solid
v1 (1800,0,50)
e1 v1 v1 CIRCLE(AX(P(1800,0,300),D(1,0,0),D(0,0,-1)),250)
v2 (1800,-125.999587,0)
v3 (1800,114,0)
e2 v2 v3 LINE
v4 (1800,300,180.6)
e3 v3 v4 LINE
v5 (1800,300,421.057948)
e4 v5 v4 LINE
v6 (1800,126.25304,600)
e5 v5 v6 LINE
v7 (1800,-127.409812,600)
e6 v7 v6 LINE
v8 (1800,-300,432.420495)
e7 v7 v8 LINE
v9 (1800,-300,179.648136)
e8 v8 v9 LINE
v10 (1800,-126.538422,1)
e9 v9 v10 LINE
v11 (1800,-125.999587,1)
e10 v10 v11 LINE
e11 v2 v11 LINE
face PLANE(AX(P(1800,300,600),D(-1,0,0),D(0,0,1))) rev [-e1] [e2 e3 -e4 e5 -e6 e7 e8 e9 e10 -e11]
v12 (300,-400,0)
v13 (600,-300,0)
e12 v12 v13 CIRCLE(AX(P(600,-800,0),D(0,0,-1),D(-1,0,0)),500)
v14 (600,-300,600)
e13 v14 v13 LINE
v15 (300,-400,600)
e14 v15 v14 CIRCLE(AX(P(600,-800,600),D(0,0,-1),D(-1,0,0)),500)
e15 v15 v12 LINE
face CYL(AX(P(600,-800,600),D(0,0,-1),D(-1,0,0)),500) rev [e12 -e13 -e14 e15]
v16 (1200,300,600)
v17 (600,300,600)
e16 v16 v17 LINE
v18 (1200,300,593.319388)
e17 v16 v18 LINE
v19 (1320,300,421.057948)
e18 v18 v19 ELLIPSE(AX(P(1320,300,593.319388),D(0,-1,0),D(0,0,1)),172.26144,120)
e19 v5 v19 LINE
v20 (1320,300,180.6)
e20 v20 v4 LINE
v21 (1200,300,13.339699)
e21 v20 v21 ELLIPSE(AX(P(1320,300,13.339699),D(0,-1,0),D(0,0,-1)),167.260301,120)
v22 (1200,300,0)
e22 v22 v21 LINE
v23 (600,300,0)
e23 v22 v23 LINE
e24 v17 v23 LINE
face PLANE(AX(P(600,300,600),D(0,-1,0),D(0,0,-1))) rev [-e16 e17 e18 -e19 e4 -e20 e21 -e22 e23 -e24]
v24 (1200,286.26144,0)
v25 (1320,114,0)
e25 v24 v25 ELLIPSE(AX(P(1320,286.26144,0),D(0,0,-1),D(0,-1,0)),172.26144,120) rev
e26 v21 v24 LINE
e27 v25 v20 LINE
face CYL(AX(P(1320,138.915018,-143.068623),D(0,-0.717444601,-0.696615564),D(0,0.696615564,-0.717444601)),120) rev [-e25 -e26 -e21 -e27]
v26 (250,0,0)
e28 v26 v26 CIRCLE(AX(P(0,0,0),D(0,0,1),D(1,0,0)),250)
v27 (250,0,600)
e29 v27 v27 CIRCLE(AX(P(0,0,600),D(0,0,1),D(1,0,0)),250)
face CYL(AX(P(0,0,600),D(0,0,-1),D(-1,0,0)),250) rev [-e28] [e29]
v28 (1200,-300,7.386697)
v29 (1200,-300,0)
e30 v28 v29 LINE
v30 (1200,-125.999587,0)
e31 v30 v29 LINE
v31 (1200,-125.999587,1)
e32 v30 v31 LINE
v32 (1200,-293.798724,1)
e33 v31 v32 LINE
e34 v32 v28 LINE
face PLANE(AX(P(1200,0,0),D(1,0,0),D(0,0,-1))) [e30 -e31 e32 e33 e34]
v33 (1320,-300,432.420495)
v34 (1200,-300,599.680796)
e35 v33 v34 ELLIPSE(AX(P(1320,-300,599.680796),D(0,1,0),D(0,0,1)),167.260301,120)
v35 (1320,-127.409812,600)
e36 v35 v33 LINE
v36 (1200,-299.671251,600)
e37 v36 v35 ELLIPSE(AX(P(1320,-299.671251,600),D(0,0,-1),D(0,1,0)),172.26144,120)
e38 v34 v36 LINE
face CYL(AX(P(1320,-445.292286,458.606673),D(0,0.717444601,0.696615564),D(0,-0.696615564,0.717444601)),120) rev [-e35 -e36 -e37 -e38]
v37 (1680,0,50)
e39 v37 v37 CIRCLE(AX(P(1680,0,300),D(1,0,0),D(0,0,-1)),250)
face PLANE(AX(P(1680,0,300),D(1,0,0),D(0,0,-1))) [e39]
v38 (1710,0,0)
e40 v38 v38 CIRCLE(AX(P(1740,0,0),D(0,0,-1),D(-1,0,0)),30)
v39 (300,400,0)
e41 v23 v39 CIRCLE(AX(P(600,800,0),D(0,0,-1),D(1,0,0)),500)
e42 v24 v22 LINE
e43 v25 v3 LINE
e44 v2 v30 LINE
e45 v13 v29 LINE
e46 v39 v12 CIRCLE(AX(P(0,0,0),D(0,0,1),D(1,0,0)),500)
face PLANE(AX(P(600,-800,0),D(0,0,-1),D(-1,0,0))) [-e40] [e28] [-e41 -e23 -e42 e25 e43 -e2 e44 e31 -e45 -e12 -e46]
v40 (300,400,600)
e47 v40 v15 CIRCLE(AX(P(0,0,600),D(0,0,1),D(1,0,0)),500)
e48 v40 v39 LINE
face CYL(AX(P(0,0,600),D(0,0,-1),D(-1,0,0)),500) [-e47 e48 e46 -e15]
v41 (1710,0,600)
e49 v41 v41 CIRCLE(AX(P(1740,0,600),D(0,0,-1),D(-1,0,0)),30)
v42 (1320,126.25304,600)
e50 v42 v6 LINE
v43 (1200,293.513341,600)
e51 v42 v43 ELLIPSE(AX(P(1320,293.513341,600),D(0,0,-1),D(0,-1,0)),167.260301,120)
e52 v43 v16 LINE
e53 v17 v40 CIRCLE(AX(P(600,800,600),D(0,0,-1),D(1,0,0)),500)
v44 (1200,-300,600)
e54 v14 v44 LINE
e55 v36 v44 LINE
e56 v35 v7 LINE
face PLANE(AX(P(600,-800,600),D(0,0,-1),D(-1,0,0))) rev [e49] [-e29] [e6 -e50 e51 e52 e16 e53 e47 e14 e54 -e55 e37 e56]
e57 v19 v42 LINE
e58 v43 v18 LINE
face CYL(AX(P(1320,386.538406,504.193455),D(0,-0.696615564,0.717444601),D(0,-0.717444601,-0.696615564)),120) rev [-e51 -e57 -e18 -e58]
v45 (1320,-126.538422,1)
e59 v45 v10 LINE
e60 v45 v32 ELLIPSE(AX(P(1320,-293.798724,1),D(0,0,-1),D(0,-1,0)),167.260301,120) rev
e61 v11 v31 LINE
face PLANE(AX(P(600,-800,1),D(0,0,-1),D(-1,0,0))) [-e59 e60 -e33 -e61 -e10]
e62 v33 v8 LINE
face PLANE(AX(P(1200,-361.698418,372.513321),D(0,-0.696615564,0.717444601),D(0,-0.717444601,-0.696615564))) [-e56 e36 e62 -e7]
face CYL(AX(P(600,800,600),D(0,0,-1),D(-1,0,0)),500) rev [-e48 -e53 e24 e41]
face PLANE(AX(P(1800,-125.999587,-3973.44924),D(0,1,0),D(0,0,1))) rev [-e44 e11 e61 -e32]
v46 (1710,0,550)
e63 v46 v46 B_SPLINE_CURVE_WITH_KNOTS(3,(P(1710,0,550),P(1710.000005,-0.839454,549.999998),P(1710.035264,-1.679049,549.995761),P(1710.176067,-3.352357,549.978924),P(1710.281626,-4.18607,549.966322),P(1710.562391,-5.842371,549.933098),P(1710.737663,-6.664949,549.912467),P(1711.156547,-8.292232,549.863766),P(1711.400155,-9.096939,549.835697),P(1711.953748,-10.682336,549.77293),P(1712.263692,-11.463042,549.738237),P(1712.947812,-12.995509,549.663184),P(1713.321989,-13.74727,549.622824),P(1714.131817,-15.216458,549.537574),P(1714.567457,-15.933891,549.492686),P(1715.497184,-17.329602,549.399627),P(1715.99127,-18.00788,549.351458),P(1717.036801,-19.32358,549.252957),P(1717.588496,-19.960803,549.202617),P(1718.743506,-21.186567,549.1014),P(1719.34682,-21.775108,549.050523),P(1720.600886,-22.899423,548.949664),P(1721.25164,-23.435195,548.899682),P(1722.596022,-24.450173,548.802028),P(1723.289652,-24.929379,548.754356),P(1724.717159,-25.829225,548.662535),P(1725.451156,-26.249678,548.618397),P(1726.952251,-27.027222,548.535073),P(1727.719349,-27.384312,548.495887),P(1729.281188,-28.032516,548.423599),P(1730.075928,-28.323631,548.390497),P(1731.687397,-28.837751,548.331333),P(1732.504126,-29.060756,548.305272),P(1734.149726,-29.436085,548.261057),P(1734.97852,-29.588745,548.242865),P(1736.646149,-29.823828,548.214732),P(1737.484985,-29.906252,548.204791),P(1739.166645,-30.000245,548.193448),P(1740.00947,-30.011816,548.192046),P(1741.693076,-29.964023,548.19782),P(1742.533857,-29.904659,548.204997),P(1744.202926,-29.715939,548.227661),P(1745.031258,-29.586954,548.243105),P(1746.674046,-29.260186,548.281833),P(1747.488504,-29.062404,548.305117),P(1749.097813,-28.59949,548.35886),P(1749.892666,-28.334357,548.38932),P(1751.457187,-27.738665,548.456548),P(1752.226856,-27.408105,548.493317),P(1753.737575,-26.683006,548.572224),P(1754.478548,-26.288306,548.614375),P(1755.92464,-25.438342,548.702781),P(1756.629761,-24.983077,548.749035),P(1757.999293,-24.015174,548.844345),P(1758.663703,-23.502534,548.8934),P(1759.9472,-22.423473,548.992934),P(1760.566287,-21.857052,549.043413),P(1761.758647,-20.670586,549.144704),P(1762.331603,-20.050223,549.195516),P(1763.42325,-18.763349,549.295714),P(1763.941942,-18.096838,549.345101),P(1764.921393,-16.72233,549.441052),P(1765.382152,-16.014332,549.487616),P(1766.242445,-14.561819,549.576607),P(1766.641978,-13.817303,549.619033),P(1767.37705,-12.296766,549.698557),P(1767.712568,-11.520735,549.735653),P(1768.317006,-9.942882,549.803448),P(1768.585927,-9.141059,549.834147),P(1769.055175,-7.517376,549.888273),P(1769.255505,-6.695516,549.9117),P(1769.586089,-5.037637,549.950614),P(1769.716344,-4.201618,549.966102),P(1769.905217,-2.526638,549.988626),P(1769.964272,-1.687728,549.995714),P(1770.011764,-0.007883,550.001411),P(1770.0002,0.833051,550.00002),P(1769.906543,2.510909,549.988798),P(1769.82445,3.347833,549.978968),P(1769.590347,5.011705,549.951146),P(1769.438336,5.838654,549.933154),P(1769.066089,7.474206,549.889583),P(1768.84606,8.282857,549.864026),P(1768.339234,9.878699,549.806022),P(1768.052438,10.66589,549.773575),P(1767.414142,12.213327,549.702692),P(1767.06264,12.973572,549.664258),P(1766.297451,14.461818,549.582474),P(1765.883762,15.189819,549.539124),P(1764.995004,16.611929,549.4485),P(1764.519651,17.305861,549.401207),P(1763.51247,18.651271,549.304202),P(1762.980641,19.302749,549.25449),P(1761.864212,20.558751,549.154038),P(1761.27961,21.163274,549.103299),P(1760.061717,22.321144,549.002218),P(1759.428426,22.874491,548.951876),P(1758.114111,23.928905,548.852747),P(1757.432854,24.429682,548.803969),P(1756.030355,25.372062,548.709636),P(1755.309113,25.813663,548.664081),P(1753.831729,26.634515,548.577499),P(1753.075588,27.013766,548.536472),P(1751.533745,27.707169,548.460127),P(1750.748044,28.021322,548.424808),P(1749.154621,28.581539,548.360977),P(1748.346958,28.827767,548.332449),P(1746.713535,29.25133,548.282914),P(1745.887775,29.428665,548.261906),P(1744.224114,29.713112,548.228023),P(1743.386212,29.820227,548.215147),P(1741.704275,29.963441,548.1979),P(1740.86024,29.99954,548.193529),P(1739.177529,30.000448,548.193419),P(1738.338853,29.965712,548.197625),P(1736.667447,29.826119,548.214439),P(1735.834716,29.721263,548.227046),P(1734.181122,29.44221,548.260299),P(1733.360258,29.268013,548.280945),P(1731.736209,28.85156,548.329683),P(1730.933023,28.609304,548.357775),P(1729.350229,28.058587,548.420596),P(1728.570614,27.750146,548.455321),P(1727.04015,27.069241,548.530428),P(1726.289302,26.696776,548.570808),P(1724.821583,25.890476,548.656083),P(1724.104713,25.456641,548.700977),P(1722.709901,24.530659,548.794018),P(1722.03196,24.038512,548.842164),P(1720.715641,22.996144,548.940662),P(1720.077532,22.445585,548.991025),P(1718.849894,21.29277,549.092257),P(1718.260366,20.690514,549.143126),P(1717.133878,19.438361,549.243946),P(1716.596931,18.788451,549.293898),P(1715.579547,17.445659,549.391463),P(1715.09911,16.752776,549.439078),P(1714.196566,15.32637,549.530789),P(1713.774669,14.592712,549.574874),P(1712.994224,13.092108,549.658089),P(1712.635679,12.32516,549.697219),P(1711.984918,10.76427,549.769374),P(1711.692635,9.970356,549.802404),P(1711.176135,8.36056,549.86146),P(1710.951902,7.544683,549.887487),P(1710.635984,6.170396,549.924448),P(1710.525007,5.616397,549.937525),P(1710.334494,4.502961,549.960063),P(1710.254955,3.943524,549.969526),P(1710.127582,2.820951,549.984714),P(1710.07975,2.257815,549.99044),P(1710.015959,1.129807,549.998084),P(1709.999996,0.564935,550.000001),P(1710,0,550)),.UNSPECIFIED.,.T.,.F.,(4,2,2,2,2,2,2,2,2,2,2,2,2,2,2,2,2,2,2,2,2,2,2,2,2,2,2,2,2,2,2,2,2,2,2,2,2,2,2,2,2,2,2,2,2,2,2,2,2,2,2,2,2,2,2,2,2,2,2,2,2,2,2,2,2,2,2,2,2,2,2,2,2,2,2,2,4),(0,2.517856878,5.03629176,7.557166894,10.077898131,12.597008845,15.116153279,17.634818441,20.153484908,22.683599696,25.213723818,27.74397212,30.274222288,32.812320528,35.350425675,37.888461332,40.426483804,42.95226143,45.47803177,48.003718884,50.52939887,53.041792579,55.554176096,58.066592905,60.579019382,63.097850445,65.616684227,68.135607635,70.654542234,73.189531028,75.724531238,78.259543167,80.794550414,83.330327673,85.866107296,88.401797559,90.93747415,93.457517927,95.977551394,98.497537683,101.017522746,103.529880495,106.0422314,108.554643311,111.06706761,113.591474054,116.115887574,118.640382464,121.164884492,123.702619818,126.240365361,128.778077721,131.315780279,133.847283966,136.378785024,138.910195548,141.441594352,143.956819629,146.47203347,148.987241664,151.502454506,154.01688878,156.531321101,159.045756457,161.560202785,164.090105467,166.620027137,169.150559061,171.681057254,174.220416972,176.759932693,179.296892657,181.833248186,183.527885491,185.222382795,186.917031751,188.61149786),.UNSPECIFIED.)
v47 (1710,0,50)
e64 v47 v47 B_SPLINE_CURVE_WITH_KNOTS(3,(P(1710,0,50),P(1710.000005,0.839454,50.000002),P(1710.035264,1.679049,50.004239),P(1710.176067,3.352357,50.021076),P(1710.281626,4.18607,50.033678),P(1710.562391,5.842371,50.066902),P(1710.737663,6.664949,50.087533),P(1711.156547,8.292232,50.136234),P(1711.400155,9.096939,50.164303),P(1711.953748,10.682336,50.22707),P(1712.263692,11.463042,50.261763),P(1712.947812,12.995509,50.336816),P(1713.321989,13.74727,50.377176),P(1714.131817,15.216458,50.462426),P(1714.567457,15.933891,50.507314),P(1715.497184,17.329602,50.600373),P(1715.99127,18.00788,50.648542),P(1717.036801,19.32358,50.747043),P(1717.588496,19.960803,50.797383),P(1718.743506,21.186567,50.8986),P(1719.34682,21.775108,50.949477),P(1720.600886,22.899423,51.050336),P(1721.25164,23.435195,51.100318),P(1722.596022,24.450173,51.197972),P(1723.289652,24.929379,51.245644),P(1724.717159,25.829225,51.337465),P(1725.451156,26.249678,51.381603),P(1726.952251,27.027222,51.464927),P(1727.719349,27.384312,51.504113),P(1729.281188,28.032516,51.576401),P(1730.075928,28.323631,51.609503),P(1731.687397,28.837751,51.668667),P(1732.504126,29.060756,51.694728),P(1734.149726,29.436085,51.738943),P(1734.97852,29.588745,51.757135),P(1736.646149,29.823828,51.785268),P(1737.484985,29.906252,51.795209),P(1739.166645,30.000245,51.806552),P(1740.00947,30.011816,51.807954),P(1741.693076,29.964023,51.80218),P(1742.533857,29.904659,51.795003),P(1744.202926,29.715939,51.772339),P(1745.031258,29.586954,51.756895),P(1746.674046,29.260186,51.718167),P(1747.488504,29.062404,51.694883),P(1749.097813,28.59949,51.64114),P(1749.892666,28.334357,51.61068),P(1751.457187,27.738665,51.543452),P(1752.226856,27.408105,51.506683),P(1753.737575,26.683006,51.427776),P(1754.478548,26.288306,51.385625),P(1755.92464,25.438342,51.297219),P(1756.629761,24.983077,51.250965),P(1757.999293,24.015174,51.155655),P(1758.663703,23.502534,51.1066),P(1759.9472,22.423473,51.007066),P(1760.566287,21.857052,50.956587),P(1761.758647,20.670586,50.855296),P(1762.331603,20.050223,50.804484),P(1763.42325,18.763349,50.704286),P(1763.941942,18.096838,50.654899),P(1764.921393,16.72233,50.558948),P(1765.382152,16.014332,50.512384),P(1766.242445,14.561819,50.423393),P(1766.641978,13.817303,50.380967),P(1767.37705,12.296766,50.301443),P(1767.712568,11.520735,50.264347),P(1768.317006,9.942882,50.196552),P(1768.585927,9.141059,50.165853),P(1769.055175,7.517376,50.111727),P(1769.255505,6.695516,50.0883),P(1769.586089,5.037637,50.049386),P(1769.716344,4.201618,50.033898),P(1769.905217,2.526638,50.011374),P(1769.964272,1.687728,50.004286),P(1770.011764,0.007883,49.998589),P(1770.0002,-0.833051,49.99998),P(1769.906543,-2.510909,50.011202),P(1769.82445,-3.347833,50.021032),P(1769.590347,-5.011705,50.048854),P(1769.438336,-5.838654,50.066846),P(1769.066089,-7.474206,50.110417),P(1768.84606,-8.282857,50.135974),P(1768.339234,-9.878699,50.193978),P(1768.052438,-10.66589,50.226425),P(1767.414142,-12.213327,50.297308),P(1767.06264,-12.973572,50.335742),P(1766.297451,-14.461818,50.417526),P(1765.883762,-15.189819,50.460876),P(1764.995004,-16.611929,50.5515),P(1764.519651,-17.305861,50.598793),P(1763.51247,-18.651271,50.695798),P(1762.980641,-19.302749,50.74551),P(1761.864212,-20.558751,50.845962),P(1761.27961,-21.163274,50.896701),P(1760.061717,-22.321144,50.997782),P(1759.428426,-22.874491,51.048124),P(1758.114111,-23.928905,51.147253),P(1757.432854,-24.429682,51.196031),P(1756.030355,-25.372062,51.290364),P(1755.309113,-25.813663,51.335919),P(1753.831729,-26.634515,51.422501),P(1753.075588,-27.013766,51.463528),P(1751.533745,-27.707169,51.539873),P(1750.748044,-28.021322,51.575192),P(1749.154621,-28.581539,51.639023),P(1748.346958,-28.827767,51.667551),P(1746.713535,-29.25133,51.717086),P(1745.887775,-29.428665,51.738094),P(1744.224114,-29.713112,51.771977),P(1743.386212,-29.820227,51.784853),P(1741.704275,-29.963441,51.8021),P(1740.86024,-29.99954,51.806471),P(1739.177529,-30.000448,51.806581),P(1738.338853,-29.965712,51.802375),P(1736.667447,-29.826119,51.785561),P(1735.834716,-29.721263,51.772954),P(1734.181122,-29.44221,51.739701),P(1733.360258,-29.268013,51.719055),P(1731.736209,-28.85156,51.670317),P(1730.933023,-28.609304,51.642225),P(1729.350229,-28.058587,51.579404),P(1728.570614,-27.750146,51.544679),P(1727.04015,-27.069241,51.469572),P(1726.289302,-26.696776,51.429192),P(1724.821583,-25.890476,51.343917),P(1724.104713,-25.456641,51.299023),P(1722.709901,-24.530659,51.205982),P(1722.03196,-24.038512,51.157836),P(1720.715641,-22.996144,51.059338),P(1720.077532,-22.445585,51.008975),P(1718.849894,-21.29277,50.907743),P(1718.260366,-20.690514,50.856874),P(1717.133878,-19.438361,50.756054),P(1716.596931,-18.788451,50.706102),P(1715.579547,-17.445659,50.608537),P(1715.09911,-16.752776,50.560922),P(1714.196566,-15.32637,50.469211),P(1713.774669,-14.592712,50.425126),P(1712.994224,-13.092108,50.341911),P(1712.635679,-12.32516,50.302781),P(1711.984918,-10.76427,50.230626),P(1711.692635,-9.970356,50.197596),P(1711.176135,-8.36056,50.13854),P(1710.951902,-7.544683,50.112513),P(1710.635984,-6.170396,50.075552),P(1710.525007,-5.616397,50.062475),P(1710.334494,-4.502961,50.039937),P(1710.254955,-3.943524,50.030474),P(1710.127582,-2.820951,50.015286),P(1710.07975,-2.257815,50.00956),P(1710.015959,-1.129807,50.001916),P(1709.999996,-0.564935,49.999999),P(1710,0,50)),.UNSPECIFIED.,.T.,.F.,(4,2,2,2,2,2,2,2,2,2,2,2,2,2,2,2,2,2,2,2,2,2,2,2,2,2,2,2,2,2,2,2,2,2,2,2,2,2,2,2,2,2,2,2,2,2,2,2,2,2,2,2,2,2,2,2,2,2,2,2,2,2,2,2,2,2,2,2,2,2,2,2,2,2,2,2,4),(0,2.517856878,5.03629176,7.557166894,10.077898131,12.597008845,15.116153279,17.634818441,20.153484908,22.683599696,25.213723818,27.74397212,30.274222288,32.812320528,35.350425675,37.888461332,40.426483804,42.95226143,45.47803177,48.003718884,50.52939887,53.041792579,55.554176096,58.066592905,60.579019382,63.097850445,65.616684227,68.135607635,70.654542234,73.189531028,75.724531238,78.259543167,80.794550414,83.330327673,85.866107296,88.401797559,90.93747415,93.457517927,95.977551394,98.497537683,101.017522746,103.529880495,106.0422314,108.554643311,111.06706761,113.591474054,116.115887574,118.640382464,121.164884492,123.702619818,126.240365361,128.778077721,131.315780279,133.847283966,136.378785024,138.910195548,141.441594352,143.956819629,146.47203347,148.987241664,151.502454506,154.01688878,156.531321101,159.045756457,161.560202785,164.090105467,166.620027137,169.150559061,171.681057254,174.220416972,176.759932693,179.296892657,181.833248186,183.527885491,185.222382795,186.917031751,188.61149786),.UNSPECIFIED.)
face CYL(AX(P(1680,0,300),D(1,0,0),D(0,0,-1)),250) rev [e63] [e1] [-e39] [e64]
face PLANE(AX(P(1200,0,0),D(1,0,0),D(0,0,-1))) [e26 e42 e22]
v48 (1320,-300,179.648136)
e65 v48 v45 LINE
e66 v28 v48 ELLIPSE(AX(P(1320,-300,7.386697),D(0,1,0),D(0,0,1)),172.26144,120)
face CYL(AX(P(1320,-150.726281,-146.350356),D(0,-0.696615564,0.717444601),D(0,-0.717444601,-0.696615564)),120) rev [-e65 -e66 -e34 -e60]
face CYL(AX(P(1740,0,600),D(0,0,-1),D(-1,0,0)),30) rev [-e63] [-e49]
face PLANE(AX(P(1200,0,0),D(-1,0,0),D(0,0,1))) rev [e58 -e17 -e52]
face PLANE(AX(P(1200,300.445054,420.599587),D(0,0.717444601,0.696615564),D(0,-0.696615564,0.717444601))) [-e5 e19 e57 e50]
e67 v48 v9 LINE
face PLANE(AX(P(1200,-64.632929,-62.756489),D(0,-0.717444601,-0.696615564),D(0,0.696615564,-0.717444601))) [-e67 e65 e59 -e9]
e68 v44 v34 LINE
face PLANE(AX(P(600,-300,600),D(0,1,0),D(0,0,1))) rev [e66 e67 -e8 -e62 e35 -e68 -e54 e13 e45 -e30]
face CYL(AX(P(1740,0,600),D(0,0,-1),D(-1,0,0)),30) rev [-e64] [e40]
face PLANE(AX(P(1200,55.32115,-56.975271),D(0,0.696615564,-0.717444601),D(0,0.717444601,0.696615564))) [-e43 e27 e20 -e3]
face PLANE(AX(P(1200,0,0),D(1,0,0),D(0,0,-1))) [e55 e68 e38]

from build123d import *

# Parameters (mm, degrees)
SKETCH1_R              = 250
BOSS_EXTRUDE1_DEPTH    = 600
CUT_EXTRUDE6_DEPTH     = 600
CUT_EXTRUDE8_START     = -1
CUT_EXTRUDE8_OUTLINE_W = 600
CUT_EXTRUDE8_OUTLINE_H = 174.000412652
CUT_EXTRUDE8_DEPTH     = 1
FILLET2_R              = 120
SKETCH8_R              = 250
CUT_EXTRUDE10_DEPTH    = 120
SKETCH9_R              = 30
CUT_EXTRUDE11_DEPTH    = 1963.141687035


# Read off the part's stored shape, not the designer's step: Cut-Extrude8
with BuildPart() as part:
    # Sketch1 → Boss-Extrude1 (new body)
    with BuildSketch(Plane.XY):
        with BuildLine():
            Line((600, 300), (1800, 300))
            Line((1800, 300), (1800, -300))
            Line((1800, -300), (600, -300))
            ThreePointArc((600, -300), (441.886116992, -325.658350975), (300, -400))
            ThreePointArc((300, -400), (-500, 0), (300, 400))
            ThreePointArc((300, 400), (441.886116992, 325.658350975), (600, 300))
        make_face()
        Circle(SKETCH1_R, mode=Mode.SUBTRACT)
    extrude(amount=BOSS_EXTRUDE1_DEPTH)

    # Sketch2 → Cut-Extrude6 (cut)
    with BuildSketch(Plane(origin=(1800, 0, 0), x_dir=(0, 0, -1), z_dir=(1, 0, 0))):
        Polygon((-180.6, 300), (0, 114), (0, 300), align=None)
        Polygon((-600, -300), (-432.420494682, -300), (-600, -127.409811799), align=None)
        Polygon((-0.445053521, -300), (-0.445053521, -125.999587348), (-179.648136318, -300), align=None)
        Polygon((-606.599587348, 119.845053521), (-606.599587348, 300.445053521), (-420.599587348, 300.445053521), align=None)
    extrude(amount=-CUT_EXTRUDE6_DEPTH, mode=Mode.SUBTRACT)

    # Cut-Extrude8 outline → Cut-Extrude8 (cut)
    with BuildSketch(Plane(origin=(0, 0, 0), x_dir=(-1, 0, 0), z_dir=(0, 0, -1)).offset(CUT_EXTRUDE8_START)):
        with Locations((-1500, -212.999793674)):
            Rectangle(CUT_EXTRUDE8_OUTLINE_W, CUT_EXTRUDE8_OUTLINE_H)
    extrude(amount=CUT_EXTRUDE8_DEPTH, mode=Mode.SUBTRACT)

    # Fillet2
    fillet2_edges = [part.edges().sort_by_distance(p)[0] for p in [
        (1200, 213.126519973, 510.528974059),
        (1200, -213.269211239, 90.324068159),
        (1200, -213.7049059, 516.210247341),
        (1200, 207, 90.3),
    ]]
    fillet(fillet2_edges, radius=FILLET2_R)

    # Sketch8 → Cut-Extrude10 (cut)
    with BuildSketch(Plane(origin=(1800, 0, 0), x_dir=(0, 0, -1), z_dir=(1, 0, 0))):
        with Locations((-300, 0)):
            Circle(SKETCH8_R)
    extrude(amount=-CUT_EXTRUDE10_DEPTH, mode=Mode.SUBTRACT)

    # Sketch9 → Cut-Extrude11 (cut, through all)
    with BuildSketch(Plane(origin=(0, 0, 0), x_dir=(-1, 0, 0), z_dir=(0, 0, -1))):
        with Locations((-1740, 0)):
            Circle(SKETCH9_R)
    extrude(amount=-CUT_EXTRUDE11_DEPTH, mode=Mode.SUBTRACT)


solid = part.part
